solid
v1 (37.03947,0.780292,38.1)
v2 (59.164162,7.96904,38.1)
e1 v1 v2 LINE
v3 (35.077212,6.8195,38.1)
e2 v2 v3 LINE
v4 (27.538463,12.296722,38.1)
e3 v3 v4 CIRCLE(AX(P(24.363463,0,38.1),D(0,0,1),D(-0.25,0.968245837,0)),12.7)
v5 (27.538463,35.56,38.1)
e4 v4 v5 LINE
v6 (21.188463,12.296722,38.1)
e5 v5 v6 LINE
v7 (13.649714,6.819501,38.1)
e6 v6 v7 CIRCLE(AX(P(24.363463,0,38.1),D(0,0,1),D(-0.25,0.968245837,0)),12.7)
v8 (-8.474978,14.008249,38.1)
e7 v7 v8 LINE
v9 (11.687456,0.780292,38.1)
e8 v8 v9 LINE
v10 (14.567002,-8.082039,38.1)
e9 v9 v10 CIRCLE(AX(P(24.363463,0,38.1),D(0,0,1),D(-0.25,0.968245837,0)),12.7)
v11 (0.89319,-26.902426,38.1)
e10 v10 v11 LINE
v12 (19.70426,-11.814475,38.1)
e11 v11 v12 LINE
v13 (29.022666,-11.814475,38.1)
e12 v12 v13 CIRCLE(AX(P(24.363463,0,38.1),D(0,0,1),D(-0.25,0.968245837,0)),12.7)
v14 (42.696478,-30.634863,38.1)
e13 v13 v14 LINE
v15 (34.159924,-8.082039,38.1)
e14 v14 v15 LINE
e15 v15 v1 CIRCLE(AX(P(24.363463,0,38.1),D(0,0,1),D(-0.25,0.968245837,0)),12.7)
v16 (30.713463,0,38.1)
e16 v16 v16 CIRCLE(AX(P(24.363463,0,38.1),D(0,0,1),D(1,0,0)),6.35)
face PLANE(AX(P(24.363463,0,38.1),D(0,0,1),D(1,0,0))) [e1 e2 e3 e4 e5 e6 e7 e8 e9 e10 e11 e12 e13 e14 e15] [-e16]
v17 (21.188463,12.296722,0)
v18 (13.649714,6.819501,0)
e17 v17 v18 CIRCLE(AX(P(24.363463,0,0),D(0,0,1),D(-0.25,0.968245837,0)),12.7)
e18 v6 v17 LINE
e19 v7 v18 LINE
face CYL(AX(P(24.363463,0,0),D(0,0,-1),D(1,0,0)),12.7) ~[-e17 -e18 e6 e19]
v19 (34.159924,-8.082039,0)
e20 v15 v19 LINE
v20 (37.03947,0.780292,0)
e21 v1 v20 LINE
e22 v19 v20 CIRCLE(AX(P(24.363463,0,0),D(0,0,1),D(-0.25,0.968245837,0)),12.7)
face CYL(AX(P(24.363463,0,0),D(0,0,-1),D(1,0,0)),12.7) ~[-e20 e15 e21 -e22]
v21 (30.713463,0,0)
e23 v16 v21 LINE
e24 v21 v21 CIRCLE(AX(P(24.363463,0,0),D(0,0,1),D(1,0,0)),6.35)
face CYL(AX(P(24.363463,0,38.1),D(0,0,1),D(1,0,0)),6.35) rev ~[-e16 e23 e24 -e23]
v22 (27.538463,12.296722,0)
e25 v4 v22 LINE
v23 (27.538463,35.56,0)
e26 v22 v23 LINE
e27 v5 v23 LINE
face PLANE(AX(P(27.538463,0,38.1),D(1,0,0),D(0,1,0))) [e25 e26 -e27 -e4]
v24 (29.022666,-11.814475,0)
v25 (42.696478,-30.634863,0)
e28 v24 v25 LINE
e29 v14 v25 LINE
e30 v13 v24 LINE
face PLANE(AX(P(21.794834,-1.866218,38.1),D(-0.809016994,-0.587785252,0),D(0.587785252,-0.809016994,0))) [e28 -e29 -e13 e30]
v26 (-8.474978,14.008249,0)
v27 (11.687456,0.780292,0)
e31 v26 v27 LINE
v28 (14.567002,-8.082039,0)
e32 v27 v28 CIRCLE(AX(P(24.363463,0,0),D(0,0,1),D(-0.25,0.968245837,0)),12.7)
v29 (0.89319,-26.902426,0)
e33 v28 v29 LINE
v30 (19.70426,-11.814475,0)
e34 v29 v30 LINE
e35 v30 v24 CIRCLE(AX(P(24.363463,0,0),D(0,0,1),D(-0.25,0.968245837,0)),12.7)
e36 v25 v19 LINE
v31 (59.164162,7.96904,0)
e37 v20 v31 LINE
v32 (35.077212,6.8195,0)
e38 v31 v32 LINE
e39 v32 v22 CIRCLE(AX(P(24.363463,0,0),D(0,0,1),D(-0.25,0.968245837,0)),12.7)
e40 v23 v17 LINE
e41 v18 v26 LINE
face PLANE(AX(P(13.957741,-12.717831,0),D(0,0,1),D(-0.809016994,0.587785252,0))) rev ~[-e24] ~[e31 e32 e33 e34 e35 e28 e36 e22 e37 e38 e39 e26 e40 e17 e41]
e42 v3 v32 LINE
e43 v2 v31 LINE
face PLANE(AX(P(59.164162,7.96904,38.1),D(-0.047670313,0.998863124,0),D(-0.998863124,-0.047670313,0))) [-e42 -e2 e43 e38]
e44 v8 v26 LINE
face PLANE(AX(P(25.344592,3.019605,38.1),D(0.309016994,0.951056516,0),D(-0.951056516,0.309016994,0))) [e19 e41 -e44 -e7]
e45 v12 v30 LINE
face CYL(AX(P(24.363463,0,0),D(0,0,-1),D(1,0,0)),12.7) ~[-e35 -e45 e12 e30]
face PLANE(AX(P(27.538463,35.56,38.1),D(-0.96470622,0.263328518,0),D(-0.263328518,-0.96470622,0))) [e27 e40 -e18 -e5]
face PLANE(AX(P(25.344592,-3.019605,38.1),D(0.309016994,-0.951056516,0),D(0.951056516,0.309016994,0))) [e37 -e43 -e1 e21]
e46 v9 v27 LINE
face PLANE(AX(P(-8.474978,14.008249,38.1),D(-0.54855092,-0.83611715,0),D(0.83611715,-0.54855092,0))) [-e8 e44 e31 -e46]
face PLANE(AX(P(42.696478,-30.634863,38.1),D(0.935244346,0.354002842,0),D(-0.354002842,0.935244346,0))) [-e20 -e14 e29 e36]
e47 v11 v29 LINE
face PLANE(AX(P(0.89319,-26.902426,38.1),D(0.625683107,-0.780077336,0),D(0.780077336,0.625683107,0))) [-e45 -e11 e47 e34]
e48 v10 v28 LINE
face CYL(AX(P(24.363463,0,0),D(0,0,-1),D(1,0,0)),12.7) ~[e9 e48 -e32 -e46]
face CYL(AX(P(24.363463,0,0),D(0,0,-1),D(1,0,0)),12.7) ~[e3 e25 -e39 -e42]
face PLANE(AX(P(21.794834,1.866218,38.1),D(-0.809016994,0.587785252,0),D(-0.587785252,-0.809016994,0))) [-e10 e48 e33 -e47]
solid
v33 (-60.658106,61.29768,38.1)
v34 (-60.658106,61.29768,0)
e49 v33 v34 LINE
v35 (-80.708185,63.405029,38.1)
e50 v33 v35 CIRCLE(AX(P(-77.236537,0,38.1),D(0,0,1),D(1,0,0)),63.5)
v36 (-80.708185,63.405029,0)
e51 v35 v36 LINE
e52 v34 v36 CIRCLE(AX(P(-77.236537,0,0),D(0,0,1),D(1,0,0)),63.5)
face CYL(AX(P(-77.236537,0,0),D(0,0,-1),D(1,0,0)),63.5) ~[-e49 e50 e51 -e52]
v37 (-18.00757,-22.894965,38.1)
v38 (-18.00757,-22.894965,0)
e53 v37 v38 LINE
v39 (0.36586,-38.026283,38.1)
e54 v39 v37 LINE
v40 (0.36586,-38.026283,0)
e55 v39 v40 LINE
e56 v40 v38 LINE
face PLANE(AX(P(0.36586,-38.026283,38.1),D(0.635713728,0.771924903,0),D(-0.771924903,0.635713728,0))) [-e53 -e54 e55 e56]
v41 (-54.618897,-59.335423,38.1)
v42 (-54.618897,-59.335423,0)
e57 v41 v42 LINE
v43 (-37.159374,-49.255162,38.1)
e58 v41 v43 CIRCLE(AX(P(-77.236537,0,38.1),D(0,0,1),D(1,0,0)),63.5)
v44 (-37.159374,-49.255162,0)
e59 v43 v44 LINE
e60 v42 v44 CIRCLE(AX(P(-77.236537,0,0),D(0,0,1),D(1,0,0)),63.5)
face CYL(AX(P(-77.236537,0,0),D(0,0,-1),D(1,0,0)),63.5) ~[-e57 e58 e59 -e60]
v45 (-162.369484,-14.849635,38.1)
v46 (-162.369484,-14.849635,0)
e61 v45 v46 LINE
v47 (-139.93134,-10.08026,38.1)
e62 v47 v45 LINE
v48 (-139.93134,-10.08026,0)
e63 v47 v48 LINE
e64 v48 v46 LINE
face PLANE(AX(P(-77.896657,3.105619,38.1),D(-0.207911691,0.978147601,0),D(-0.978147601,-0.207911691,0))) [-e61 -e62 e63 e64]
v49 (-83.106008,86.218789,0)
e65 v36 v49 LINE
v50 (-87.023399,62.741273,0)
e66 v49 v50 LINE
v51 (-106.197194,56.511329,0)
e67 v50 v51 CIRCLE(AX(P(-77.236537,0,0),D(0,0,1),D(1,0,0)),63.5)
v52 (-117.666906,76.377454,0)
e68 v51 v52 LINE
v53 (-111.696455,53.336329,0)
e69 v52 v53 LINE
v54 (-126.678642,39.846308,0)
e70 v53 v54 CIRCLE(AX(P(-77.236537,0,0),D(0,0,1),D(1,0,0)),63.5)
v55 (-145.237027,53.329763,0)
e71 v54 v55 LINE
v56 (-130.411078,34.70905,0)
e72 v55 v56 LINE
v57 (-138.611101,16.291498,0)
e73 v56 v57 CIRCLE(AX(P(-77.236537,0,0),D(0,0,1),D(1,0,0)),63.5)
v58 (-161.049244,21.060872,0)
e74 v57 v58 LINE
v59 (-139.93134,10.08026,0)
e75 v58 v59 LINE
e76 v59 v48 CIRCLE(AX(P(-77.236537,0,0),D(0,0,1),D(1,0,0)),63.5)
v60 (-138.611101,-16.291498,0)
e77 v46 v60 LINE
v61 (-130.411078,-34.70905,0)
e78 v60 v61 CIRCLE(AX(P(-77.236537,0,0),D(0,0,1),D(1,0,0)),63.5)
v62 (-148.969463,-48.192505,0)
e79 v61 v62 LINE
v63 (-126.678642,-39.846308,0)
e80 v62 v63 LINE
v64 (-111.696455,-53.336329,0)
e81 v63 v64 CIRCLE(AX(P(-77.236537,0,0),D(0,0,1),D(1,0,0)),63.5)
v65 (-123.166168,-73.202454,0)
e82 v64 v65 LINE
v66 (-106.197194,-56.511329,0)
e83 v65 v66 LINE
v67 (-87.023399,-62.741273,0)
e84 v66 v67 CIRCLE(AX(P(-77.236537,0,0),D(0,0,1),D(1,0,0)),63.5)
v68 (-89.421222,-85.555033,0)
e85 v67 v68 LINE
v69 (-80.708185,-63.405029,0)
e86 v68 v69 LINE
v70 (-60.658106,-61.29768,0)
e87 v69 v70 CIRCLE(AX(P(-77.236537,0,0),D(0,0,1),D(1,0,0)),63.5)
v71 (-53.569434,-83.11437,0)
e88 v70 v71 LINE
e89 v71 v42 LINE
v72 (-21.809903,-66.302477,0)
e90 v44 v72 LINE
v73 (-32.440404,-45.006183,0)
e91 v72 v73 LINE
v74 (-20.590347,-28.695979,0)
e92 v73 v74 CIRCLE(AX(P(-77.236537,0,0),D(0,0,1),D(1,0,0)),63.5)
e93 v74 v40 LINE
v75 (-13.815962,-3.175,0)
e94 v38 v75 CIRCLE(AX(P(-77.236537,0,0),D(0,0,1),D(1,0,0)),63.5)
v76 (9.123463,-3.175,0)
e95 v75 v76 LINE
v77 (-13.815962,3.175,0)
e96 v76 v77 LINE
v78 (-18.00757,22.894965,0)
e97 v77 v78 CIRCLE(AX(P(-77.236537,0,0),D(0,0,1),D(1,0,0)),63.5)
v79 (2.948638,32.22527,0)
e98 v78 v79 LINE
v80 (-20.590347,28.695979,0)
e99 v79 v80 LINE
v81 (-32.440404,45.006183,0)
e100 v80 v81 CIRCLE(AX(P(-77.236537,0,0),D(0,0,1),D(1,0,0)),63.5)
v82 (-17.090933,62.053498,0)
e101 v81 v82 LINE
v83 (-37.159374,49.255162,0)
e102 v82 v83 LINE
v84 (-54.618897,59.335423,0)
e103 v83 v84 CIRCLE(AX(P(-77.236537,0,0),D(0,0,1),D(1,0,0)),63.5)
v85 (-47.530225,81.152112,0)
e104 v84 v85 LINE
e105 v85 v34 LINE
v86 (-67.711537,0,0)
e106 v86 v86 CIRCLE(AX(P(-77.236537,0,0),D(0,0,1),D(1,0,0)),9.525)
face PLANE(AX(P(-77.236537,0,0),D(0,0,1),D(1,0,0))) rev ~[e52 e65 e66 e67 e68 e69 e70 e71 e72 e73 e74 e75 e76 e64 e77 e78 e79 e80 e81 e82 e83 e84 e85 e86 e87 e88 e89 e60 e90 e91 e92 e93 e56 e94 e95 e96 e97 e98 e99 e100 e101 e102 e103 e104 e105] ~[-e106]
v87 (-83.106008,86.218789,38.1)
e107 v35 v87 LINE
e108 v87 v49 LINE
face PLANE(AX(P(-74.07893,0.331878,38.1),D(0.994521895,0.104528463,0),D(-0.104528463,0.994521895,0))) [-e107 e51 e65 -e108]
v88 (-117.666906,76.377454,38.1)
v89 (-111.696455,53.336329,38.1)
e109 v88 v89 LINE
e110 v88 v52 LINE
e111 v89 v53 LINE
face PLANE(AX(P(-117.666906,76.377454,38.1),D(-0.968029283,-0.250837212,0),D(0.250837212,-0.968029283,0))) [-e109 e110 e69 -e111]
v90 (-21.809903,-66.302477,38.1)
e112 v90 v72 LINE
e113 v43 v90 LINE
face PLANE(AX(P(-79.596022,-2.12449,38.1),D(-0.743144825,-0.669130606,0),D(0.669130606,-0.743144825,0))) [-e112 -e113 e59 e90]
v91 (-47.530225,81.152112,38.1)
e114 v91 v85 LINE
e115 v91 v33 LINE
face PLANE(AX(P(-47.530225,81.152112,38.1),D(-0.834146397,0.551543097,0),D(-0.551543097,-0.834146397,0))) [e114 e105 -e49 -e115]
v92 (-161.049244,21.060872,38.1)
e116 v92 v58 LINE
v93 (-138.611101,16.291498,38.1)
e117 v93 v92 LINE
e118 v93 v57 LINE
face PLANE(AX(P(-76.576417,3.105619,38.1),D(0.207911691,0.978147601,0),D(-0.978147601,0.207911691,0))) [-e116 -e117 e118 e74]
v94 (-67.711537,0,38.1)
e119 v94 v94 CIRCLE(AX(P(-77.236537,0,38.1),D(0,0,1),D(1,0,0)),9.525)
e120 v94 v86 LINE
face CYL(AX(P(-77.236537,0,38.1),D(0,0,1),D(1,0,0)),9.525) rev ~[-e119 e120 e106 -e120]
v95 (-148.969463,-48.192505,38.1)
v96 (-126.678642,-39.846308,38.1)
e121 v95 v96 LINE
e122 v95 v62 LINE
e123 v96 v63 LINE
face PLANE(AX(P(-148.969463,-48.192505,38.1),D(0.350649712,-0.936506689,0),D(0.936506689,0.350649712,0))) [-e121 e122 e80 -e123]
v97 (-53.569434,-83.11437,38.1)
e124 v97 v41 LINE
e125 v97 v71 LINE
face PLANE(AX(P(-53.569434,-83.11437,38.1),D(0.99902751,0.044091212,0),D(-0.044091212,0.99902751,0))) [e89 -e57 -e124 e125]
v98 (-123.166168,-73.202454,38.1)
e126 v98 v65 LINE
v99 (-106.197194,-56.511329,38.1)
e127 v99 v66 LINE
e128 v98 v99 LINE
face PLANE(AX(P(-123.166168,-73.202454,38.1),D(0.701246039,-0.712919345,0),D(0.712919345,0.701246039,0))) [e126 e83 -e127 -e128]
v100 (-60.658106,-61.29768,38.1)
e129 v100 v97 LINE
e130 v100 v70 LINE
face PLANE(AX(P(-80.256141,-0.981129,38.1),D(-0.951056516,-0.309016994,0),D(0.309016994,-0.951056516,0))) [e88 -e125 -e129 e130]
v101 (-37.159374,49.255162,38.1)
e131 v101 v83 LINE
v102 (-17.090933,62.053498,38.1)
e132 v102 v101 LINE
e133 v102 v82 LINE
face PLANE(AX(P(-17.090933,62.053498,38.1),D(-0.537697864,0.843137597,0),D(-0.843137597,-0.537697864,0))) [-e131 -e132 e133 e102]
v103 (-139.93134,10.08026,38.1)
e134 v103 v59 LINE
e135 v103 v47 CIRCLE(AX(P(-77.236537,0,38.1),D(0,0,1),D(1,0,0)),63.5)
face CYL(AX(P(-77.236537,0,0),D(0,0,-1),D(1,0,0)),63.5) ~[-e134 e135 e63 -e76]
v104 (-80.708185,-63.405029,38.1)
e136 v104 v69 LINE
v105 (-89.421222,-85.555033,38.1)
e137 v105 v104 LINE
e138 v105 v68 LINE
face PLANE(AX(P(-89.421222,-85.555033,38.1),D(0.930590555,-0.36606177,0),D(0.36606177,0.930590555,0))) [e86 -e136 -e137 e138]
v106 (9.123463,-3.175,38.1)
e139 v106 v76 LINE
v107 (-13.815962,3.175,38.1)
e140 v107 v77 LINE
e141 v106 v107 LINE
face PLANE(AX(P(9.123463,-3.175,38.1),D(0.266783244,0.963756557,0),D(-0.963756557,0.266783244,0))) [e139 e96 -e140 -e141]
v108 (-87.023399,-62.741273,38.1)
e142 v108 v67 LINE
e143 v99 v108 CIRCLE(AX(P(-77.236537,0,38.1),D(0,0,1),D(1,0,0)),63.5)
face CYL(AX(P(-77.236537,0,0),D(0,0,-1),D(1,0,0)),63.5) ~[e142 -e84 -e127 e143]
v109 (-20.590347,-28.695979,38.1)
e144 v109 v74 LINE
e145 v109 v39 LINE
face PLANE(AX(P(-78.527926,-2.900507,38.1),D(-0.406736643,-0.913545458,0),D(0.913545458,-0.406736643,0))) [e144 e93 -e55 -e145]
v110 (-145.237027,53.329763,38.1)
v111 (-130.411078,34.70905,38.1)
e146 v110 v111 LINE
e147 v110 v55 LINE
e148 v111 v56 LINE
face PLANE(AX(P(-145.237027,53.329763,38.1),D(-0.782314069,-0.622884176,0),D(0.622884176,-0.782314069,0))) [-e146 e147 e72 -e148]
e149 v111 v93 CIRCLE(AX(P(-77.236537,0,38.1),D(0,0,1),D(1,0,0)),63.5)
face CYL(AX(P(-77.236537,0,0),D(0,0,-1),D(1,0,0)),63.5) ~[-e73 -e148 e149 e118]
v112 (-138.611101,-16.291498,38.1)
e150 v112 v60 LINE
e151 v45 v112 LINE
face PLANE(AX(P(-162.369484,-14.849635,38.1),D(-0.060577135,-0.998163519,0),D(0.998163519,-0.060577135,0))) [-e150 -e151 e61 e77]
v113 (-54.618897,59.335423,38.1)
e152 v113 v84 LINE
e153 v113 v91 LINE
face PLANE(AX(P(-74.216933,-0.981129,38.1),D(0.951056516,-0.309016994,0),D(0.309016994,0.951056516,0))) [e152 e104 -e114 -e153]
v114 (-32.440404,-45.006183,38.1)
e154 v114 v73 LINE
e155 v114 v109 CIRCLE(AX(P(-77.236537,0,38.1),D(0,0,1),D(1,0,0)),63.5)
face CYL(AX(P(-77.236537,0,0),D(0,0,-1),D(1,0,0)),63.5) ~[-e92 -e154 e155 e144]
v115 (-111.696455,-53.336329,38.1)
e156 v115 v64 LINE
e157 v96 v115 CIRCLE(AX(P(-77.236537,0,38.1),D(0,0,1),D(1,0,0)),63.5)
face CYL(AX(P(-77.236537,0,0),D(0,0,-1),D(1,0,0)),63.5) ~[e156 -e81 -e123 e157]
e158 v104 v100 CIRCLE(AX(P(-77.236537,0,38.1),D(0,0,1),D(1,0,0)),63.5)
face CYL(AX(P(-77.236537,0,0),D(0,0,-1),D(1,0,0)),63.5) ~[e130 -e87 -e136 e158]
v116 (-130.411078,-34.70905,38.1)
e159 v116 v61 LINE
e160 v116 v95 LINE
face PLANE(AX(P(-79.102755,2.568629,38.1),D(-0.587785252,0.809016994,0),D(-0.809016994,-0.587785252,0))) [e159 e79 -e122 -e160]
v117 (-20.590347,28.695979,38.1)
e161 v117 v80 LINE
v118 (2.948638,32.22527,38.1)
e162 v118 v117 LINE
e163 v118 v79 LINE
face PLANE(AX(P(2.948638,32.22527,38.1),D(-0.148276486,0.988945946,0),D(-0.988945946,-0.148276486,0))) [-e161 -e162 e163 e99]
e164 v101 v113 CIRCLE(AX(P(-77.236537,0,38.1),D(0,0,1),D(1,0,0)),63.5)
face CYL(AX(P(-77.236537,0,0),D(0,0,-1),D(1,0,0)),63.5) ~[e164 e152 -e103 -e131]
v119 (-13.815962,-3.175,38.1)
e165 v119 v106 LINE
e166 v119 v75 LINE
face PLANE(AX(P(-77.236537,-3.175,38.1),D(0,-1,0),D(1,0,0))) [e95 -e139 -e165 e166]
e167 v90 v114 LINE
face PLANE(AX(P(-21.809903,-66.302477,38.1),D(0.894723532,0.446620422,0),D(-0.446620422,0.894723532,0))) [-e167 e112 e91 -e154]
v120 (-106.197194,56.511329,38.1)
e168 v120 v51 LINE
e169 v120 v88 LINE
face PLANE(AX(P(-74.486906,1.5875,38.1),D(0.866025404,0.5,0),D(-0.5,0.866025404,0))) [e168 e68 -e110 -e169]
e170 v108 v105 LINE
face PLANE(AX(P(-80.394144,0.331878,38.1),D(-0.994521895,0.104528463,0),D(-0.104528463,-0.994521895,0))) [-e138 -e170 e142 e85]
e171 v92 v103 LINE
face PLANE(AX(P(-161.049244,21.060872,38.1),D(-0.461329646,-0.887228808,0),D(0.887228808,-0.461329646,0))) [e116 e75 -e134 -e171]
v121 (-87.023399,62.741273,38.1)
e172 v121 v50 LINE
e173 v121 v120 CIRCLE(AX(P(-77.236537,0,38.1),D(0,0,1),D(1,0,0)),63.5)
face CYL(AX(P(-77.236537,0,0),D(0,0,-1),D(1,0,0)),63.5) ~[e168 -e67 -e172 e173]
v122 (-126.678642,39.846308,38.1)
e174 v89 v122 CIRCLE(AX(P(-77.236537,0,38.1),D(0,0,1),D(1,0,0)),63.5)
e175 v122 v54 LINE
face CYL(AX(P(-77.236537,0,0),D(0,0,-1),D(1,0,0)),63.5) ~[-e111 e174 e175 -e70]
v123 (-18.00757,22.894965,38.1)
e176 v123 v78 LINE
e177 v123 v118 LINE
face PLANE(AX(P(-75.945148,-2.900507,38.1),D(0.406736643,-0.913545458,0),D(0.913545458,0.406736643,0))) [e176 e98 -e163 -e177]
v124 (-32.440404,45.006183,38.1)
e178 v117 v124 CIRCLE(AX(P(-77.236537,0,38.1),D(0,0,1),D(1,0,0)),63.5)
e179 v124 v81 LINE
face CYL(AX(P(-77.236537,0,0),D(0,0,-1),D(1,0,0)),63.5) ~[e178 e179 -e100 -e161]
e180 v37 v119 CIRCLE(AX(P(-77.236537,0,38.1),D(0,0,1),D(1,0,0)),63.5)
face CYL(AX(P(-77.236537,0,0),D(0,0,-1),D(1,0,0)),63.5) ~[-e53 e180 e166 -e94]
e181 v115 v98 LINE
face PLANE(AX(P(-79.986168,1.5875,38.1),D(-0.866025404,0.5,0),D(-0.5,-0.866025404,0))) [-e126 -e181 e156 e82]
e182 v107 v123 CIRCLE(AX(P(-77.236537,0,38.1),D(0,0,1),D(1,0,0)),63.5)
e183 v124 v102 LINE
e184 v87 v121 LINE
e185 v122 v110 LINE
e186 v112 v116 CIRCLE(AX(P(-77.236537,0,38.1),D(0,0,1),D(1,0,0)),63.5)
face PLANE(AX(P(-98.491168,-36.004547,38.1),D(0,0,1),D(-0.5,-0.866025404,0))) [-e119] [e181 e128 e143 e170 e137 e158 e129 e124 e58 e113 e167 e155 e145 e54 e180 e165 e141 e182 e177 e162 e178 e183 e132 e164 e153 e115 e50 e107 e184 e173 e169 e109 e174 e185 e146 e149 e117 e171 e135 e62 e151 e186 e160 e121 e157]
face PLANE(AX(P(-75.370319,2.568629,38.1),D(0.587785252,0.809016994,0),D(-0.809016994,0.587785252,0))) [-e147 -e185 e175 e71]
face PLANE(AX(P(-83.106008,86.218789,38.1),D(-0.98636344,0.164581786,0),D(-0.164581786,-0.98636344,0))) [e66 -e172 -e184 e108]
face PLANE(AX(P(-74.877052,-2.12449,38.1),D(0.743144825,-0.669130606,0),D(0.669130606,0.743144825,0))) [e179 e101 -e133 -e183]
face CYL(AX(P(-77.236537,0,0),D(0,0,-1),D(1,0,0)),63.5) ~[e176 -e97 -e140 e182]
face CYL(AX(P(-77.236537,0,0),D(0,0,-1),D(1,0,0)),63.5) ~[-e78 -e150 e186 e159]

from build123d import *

# Parameters (mm, degrees)
F0_R            = 63.5
F1_DEPTH        = 38.1
F0_R_2          = 12.7
F3_DEPTH        = 38.1
F3_COPIES_COUNT = 15
F6_DEPTH        = 38.1
F6_COPIES_COUNT = 5
F7_R            = 9.525
F7_R_2          = 6.35
F8_DEPTH        = 38.101


# Not quite as in the source:
# - a pattern or mirror of a feature is missing from the dataset's text; its kind, count and spacing are read off the source's solid


with BuildPart() as f1:
    # F0 (on Top) → F1 (new body)
    with BuildSketch(Plane.XY):
        with Locations((-77.2365369129, 0)):
            Circle(F0_R)
    extrude(amount=F1_DEPTH)

    # F2 (on face) → F3 (join)
    with BuildSketch(Plane.XY.offset(38.1)):
        Polygon((-13.8159615844, 3.175), (-77.2365369129, 3.175), (-77.2365369129, -3.175), (9.1234630871, -3.175), align=None)
    f3 = extrude(amount=-F3_DEPTH)

    # F3_copies: F3 ×15 about axis
    f3_copies_axis = Axis((-77.236537, 0, 0), (0, 0, 1))
    for i in range(1, F3_COPIES_COUNT):
        add(f3.rotate(f3_copies_axis, i * 360 / F3_COPIES_COUNT))


with BuildPart() as f1b:
    # F0 (on Top) → F1, piece 2 (new body)
    with BuildSketch(Plane.XY):
        with Locations((24.3634630871, 0)):
            Circle(F0_R_2)
    extrude(amount=F1_DEPTH)

    # F5 (on face) → F6 (join)
    with BuildSketch(Plane.XY.offset(38.1)):
        Polygon((21.1884630871, 0), (27.5384630871, 0), (27.5384630871, 35.56), (21.1884630871, 12.2967221242), align=None)
    f6 = extrude(amount=-F6_DEPTH)

    # F6_copies: F6 ×5 about axis
    f6_copies_axis = Axis((24.363463, 0, 0), (0, 0, 1))
    for i in range(1, F6_COPIES_COUNT):
        add(f6.rotate(f6_copies_axis, i * 360 / F6_COPIES_COUNT))


with BuildPart() as f8_tool:
    # F7 (on face) → F8 (new body, through all)
    with BuildSketch(Plane.XY.offset(38.1)):
        with Locations((-77.2365369129, 0)):
            Circle(F7_R)
        with Locations((24.3634630871, 0)):
            Circle(F7_R_2)
    extrude(amount=-F8_DEPTH)


with BuildPart() as f1_1:
    add(f1.part)

    # F8: cut by f8_tool
    add(f8_tool.part, mode=Mode.SUBTRACT)


with BuildPart() as f1b_1:
    add(f1b.part)

    # F8: cut by f8_tool
    add(f8_tool.part, mode=Mode.SUBTRACT)


solid = Compound([f1_1.part, f1b_1.part])
